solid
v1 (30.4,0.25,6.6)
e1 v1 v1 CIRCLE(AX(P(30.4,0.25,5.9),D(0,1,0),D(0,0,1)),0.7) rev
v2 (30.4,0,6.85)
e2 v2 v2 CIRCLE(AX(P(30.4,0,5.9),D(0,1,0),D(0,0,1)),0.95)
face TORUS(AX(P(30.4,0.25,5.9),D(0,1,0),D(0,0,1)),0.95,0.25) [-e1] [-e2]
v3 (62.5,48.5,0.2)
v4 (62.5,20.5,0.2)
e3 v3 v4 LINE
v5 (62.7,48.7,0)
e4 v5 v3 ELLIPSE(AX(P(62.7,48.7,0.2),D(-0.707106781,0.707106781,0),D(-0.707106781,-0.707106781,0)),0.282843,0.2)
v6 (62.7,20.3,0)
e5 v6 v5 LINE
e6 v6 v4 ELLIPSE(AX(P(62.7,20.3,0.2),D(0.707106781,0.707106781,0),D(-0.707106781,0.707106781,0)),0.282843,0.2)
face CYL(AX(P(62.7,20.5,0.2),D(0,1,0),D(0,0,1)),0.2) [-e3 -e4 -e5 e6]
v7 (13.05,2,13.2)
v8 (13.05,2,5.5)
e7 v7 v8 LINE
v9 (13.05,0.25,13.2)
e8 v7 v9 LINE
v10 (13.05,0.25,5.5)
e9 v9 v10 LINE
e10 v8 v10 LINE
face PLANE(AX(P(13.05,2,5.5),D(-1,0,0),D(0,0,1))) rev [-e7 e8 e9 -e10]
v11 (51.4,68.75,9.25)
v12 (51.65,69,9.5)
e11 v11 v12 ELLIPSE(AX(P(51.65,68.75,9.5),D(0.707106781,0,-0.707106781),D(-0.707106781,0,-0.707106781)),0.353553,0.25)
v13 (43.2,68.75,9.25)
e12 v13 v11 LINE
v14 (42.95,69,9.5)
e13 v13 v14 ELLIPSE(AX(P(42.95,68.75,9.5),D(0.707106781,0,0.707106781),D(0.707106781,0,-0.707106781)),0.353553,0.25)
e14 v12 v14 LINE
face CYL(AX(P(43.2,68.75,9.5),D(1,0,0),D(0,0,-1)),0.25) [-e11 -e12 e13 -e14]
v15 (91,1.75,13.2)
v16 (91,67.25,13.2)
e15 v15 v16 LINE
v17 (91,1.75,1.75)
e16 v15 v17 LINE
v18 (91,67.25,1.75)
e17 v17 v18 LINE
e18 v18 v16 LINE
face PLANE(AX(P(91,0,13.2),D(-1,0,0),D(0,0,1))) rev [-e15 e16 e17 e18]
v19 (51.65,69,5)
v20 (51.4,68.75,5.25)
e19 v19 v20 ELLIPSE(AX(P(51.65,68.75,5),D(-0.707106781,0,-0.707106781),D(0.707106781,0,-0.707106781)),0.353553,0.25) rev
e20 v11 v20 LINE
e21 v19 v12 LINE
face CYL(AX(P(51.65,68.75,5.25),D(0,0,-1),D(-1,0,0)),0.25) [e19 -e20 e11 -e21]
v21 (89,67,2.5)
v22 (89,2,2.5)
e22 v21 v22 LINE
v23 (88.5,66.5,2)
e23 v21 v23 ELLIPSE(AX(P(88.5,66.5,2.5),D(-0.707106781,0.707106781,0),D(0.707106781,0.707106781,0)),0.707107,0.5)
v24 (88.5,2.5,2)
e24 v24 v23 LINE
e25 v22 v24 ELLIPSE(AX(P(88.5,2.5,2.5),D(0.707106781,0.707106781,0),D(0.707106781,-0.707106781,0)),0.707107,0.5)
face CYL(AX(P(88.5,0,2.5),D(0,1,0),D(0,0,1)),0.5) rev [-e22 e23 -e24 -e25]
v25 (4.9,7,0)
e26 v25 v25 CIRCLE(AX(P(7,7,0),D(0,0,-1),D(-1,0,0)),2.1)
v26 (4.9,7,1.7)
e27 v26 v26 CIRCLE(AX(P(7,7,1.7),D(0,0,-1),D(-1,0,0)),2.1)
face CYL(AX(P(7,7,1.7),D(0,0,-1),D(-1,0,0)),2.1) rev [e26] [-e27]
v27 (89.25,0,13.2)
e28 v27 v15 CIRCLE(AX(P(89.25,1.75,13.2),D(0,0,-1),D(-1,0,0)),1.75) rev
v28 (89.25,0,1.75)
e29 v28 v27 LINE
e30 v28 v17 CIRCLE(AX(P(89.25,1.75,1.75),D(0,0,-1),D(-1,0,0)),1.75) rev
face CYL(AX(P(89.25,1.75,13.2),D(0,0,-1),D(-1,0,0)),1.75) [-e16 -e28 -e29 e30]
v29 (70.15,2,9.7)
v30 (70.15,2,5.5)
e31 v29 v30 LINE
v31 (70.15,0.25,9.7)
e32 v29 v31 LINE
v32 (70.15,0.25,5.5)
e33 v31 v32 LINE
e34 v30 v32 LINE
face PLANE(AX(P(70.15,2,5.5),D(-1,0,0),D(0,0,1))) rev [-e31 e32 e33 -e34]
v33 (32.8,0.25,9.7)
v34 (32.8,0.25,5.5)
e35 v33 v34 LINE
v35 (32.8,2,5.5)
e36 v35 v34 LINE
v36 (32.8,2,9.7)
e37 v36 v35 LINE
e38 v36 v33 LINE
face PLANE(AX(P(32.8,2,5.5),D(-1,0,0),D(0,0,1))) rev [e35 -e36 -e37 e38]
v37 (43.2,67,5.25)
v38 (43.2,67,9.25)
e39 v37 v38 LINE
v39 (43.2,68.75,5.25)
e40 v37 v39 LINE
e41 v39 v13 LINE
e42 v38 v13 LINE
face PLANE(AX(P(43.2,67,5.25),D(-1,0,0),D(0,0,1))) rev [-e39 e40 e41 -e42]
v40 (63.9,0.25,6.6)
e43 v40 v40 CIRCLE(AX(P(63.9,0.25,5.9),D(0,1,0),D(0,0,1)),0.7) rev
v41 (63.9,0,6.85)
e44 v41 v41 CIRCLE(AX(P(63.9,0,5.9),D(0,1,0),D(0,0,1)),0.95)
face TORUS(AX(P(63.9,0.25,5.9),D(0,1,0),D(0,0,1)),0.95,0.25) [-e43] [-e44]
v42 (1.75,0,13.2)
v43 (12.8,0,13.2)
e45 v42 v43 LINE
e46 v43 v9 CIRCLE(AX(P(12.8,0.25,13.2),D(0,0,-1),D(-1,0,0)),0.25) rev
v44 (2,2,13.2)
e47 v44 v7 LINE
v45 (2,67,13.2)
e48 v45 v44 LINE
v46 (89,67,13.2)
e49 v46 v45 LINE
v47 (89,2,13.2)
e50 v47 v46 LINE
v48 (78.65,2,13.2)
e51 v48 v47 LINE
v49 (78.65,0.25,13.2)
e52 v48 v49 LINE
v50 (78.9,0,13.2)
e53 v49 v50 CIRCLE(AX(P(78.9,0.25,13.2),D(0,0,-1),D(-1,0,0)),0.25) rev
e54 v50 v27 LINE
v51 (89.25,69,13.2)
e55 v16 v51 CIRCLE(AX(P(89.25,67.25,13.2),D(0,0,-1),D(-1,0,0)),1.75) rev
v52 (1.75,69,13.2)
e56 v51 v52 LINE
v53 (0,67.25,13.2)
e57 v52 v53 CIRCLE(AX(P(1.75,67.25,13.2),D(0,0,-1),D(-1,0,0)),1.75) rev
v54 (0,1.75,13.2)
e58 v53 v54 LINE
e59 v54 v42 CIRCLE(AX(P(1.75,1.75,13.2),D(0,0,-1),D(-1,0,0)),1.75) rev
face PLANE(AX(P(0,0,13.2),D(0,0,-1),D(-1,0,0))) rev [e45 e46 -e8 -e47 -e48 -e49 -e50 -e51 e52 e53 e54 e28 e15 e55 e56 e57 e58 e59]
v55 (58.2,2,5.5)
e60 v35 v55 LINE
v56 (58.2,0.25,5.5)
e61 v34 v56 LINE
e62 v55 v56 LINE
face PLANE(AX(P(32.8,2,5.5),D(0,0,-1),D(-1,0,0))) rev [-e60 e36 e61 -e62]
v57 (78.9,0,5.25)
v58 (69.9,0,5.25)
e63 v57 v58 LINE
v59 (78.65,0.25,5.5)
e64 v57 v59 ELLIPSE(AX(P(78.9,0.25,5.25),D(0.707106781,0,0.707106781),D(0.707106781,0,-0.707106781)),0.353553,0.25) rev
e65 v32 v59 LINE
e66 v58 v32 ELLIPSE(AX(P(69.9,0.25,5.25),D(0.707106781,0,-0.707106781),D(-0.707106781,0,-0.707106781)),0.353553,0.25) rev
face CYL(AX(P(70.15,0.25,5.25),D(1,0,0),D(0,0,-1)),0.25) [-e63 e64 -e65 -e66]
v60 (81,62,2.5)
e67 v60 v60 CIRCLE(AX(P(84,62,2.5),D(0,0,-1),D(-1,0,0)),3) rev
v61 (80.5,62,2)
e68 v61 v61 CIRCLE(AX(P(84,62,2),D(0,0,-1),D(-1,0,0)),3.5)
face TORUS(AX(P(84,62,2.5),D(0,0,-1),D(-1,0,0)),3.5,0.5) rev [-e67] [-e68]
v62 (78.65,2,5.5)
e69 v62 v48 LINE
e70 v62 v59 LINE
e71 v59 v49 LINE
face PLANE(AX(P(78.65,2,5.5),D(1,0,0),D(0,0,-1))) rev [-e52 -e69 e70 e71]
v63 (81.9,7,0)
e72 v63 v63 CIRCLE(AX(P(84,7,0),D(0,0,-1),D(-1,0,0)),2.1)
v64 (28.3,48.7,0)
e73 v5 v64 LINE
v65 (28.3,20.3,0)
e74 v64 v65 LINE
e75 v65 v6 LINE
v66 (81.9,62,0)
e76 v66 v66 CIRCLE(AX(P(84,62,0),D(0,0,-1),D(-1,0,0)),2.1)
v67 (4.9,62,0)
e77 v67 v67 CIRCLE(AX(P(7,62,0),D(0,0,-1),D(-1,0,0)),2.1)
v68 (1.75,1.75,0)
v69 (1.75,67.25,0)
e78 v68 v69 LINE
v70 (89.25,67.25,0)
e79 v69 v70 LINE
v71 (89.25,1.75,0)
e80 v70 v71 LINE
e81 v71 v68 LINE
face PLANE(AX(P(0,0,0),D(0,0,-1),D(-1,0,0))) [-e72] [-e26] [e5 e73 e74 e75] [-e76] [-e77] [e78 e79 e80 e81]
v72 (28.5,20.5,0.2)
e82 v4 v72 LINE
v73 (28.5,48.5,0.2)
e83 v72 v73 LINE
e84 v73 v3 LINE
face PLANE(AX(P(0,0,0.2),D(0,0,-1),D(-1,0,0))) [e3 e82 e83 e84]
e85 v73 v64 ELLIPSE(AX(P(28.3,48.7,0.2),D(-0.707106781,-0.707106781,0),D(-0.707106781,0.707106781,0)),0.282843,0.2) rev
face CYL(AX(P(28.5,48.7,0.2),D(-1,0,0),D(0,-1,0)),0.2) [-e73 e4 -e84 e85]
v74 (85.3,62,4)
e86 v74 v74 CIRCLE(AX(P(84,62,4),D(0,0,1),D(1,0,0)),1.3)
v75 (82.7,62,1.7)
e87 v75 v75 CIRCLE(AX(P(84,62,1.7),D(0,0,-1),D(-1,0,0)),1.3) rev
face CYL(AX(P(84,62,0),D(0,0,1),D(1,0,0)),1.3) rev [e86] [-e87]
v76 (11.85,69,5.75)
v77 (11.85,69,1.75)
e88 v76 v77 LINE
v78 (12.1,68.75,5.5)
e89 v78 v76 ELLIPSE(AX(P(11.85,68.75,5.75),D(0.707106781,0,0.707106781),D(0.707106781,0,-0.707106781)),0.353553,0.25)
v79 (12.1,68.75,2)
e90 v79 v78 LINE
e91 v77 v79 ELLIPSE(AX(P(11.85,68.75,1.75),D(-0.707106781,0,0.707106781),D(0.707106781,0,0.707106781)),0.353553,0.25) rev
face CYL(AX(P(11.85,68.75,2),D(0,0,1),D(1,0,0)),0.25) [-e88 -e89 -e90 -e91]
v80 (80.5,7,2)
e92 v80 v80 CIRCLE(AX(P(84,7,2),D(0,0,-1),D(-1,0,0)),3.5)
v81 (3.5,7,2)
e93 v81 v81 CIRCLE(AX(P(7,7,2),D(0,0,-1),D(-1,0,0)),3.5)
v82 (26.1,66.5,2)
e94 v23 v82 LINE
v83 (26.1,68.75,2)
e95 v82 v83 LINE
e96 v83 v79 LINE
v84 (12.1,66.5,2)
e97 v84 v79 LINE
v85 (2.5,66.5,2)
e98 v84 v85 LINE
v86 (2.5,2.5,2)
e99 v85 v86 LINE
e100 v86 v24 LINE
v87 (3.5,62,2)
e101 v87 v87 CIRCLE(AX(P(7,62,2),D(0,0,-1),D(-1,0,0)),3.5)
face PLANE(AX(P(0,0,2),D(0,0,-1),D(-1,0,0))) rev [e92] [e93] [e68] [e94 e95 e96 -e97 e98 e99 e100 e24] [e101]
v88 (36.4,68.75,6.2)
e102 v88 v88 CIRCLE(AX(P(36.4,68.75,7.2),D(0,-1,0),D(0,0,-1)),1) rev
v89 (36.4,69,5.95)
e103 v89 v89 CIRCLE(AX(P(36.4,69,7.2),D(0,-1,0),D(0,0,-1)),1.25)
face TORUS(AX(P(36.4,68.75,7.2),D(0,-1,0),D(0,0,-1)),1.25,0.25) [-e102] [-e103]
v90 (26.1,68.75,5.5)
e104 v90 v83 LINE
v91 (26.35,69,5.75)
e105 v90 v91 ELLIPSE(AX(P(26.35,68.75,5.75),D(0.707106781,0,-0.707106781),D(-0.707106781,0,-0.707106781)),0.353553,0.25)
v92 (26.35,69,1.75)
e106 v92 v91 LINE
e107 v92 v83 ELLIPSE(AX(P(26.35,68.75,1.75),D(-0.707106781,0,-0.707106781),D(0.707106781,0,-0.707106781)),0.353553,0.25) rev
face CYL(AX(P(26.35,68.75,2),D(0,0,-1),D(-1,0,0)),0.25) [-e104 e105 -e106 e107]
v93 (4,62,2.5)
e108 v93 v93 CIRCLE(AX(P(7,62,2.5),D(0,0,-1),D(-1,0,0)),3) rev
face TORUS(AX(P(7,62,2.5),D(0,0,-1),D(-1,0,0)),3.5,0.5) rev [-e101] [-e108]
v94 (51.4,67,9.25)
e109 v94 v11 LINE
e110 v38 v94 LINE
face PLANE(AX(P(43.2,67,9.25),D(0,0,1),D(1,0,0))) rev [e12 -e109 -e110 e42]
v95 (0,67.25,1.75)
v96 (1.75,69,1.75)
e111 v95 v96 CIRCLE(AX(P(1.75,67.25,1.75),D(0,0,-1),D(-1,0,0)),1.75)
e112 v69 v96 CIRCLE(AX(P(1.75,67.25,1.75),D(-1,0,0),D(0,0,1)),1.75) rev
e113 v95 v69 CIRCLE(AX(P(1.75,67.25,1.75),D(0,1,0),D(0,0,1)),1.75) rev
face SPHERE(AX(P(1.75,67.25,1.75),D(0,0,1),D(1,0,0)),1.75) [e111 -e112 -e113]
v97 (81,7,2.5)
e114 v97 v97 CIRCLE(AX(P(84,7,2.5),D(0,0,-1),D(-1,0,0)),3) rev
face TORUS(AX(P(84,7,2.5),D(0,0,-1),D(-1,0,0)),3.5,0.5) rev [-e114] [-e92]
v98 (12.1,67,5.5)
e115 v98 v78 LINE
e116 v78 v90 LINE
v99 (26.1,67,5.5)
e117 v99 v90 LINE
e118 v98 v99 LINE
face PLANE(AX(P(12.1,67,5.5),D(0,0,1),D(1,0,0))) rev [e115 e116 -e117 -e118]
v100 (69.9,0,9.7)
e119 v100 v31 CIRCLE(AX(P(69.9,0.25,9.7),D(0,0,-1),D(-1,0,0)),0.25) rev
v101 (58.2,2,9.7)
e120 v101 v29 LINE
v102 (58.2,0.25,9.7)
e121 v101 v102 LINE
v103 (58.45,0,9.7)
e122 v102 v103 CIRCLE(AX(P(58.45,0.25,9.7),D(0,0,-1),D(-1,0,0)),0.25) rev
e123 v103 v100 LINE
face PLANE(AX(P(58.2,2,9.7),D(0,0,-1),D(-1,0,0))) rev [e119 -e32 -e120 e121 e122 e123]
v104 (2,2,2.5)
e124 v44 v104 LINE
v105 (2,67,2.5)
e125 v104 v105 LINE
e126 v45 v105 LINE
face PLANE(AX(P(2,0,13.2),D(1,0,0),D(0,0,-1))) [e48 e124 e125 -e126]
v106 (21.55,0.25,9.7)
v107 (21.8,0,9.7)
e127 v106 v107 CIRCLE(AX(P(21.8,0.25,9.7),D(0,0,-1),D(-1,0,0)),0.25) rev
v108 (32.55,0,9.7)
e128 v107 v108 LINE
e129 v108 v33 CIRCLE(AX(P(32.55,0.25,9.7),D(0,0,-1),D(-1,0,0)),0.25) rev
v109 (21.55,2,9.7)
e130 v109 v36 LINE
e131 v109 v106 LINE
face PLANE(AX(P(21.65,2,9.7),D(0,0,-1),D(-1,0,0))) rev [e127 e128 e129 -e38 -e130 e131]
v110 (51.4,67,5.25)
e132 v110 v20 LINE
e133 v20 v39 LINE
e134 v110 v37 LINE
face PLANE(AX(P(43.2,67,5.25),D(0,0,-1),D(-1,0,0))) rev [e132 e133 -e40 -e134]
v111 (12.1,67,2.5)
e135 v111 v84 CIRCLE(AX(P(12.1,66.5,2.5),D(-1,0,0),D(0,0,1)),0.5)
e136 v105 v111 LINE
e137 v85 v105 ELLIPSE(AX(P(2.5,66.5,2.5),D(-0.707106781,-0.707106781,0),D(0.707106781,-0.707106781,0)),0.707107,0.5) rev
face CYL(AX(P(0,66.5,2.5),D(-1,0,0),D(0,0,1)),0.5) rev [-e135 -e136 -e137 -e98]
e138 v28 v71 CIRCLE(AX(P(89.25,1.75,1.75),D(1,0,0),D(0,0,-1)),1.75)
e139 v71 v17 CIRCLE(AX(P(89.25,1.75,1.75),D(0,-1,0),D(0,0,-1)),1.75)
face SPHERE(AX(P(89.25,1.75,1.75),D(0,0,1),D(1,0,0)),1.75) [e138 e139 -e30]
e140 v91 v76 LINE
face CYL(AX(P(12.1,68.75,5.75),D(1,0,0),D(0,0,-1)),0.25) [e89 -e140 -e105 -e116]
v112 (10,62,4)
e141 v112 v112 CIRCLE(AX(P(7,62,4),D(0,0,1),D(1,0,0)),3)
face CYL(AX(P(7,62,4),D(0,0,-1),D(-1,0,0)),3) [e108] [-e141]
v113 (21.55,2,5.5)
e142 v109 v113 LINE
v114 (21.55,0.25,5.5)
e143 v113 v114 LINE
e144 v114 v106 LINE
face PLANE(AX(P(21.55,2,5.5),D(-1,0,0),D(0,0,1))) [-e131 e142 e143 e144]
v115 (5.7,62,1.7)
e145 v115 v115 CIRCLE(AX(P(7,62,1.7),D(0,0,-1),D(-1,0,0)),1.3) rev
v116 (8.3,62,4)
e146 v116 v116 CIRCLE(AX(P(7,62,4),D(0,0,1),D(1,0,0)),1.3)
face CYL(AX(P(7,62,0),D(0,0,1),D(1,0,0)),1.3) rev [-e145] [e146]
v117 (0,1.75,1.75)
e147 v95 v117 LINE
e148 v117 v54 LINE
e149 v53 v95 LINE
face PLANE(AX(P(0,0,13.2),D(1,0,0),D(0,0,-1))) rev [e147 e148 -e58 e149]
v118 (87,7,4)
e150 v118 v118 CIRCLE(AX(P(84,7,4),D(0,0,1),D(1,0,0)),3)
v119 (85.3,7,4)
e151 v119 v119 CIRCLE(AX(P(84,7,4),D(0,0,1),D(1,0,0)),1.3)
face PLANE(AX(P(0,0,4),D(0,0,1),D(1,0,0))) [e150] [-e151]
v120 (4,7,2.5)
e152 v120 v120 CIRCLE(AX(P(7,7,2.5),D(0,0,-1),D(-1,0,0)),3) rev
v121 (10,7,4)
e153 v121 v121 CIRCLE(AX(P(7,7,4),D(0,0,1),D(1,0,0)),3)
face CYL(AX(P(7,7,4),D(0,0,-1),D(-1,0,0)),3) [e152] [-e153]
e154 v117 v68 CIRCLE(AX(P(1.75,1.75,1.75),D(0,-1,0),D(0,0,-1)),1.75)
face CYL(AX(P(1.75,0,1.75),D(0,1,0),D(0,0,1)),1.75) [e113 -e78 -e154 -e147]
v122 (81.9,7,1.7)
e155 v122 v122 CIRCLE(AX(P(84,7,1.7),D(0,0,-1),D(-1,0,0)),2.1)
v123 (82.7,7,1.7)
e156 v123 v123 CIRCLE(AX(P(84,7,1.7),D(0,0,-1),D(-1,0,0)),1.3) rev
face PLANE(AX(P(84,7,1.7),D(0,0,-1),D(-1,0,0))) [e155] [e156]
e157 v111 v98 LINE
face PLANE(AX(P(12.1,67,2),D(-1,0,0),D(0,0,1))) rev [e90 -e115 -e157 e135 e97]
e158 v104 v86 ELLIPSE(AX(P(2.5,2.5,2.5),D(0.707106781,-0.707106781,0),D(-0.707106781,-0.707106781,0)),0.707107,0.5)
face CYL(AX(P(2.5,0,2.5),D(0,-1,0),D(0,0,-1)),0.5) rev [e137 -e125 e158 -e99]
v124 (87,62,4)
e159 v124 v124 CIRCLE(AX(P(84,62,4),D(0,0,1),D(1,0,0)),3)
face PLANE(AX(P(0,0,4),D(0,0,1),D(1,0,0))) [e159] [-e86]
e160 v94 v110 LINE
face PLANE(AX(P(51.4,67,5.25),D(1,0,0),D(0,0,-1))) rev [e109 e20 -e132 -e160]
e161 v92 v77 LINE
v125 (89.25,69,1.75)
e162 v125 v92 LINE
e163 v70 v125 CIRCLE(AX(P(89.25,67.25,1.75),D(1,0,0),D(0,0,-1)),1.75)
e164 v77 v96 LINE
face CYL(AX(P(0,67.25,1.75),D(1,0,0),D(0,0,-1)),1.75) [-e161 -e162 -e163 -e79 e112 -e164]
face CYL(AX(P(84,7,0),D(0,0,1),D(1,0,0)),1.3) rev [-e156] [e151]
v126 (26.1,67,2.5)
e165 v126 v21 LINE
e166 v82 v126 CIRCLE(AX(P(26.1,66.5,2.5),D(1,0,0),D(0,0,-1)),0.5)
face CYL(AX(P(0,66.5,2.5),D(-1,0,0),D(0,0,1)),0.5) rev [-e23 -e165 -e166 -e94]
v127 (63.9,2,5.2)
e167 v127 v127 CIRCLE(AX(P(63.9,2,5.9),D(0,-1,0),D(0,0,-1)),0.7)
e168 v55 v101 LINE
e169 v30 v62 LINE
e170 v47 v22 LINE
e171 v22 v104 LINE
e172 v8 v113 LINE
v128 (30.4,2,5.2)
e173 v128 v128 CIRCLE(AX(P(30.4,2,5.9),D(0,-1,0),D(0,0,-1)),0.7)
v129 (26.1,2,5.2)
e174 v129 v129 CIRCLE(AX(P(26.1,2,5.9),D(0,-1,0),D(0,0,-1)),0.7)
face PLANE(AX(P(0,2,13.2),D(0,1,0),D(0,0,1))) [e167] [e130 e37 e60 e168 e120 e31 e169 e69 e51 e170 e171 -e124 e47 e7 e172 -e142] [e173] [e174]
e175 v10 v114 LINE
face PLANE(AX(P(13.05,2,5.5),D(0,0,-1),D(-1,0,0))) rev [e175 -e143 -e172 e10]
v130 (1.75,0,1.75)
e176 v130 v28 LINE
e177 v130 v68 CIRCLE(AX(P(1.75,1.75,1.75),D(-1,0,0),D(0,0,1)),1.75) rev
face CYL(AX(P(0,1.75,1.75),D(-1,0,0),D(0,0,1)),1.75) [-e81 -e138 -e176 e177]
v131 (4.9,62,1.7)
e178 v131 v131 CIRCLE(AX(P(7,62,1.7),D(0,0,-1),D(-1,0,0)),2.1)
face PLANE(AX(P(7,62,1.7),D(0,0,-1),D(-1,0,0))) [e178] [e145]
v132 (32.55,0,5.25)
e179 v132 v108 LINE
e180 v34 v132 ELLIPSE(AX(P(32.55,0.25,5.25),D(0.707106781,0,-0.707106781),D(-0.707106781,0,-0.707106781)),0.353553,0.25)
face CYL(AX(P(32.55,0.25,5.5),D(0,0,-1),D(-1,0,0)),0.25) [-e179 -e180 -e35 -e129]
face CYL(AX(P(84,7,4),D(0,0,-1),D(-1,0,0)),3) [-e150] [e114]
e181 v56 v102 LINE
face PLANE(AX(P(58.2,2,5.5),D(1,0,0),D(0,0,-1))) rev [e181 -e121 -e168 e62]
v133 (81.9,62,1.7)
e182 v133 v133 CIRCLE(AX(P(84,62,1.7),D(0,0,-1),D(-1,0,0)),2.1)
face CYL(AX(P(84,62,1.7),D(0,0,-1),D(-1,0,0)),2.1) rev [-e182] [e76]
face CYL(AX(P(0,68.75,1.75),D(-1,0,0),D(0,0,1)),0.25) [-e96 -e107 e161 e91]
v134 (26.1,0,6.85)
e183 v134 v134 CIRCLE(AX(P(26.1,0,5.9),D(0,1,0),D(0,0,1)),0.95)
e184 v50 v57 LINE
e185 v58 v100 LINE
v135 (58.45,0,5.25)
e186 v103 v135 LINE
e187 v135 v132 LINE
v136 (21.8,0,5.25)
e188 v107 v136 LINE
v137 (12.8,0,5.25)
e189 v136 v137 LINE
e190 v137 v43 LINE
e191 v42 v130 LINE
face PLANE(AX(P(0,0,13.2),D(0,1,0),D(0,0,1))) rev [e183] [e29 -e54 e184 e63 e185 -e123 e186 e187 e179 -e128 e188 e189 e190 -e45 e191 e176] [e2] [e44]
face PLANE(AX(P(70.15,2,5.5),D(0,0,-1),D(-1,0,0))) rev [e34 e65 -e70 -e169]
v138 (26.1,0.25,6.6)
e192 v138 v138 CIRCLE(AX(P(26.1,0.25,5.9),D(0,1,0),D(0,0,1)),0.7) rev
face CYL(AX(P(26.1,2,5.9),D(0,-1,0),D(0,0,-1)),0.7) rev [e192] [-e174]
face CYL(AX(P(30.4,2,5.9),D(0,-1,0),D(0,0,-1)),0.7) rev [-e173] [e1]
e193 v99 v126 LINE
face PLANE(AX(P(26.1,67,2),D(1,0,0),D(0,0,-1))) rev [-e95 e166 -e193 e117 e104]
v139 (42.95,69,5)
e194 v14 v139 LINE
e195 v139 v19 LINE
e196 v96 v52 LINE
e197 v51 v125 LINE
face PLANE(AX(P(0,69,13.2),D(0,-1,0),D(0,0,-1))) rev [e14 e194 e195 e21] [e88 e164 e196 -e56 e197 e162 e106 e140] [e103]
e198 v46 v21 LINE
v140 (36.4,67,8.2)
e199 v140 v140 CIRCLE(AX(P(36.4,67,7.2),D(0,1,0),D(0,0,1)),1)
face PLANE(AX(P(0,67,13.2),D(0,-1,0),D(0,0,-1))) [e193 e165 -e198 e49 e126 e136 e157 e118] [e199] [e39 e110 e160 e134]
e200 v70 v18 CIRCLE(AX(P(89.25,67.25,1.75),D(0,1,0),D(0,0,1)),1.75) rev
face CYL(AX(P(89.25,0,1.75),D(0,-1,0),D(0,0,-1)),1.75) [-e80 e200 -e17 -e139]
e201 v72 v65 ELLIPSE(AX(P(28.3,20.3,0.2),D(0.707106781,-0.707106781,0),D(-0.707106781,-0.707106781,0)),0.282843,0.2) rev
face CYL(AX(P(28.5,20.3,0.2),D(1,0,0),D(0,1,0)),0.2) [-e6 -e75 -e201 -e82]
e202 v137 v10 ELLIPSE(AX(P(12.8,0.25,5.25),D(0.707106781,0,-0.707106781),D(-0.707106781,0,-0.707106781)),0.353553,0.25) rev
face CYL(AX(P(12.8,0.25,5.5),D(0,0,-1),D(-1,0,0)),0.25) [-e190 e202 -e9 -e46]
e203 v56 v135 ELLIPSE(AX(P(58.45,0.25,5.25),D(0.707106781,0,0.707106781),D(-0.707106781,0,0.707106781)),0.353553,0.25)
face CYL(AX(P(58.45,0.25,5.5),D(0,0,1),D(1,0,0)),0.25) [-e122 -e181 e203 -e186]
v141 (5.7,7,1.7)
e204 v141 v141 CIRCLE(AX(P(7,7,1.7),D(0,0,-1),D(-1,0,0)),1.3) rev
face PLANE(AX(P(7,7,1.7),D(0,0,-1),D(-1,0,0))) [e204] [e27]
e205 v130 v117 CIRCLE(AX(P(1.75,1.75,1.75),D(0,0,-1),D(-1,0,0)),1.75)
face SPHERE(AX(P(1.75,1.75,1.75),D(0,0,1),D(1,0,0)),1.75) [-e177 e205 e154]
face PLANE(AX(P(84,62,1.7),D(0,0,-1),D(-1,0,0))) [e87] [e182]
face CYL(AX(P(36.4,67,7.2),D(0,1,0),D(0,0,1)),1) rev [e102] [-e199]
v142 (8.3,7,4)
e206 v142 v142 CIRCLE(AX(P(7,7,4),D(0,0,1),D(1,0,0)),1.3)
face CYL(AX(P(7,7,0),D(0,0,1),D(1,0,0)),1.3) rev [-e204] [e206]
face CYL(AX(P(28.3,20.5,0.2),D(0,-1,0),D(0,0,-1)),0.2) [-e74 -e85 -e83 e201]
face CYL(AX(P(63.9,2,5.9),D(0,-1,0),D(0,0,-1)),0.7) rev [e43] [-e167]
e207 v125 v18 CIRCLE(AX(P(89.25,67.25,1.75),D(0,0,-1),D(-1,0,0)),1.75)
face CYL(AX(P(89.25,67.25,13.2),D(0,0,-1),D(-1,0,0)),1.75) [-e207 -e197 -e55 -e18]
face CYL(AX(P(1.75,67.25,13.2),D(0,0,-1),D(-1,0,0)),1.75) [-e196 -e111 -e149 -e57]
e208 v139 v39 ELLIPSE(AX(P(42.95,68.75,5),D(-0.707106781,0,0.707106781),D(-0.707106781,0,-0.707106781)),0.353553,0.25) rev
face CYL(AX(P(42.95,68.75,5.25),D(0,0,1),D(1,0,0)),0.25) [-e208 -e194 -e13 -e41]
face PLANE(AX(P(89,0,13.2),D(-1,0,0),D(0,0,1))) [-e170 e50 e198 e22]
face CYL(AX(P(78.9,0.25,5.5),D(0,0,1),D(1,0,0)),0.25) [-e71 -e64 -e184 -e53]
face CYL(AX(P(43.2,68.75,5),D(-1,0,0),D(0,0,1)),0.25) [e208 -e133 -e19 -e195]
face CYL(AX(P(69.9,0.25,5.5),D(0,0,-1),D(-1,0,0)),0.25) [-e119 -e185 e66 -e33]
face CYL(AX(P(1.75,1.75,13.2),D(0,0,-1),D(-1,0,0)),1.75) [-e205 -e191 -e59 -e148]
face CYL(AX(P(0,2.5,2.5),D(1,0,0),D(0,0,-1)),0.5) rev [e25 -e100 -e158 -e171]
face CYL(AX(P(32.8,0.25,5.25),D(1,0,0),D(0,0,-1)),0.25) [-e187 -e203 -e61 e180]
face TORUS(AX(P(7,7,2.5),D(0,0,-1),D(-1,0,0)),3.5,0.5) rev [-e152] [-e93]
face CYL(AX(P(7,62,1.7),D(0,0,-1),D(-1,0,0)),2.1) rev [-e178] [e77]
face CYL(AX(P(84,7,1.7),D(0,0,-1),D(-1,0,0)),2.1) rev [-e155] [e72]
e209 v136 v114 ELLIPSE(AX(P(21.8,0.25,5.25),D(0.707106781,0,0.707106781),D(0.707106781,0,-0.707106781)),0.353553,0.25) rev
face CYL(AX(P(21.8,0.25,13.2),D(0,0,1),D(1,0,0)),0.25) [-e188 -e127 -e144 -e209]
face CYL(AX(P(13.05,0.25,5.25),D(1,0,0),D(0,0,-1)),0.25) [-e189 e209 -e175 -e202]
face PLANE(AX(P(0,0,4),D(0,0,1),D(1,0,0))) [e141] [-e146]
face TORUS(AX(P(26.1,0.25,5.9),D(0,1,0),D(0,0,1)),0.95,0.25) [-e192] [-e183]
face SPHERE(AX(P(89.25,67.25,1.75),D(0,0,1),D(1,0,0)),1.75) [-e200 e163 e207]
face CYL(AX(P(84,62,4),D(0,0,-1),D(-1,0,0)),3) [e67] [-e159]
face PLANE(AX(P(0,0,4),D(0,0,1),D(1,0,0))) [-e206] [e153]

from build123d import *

# Parameters (mm, degrees)
SKETCH1_W           = 91
SKETCH1_H           = 69
BOSS_EXTRUDE1_DEPTH = 13.2
SHELL2_T            = -2
BOSS_EXTRUDE2_DEPTH = 2
SKETCH3_R           = 1.3
CUT_EXTRUDE1_DEPTH  = 4
SKETCH5_R           = 2.1
CUT_EXTRUDE2_DEPTH  = 1.7
SKETCH7_R           = 0.7
CUT_EXTRUDE4_DEPTH  = 2
SKETCH9_R           = 1
CUT_EXTRUDE6_DEPTH  = 2
SKETCH12_W          = 34
SKETCH12_H          = 28
CUT_EXTRUDE9_DEPTH  = 0.2
FILLET5_R           = 0.2
FILLET6_R           = 1.75
SKETCH6_W           = 8.6
SKETCH6_H           = 7.7
SKETCH6_W_2         = 8.5
SKETCH6_W_3         = 25.4
CUT_EXTRUDE10_DEPTH = 2
SKETCH8_W           = 14
SKETCH8_H           = 3.5
SKETCH8_W_2         = 8.2
SKETCH8_H_2         = 4
CUT_EXTRUDE12_DEPTH = 2
SKETCH16_W          = 0.1
SKETCH16_H          = 7.7
BOSS_EXTRUDE3_DEPTH = 2
SKETCH14_W          = 11.15
SKETCH14_H          = 3.5
SKETCH14_W_2        = 11.95
CUT_EXTRUDE13_DEPTH = 2
SKETCH17_W          = 0.1
SKETCH17_H          = 3.5
CUT_EXTRUDE14_DEPTH = 2
FILLET8_R           = 0.25
FILLET9_R           = 0.5


with BuildPart() as part:
    # Sketch1 → Boss-Extrude1 (new body)
    with BuildSketch(Plane.XY):
        with Locations((45.5, 34.5)):
            Rectangle(SKETCH1_W, SKETCH1_H)
    extrude(amount=BOSS_EXTRUDE1_DEPTH)

    # Shell2
    shell2_openings = [part.faces().sort_by_distance(p)[0] for p in [
        (45.5, 34.5, 13.2),
    ]]
    offset(amount=SHELL2_T, openings=shell2_openings, kind=Kind.INTERSECTION)

    # Sketch2 → Boss-Extrude2 (add)
    with BuildSketch(Plane.XY.offset(2)):
        with BuildLine():
            ThreePointArc((4, 7), (4.878679656, 4.878679656), (7, 4))
            Line((7, 4), (7, 7))
            Line((7, 7), (4, 7))
        make_face()
        with BuildLine():
            Line((7, 7), (7, 4))
            ThreePointArc((7, 4), (9.121320344, 4.878679656), (10, 7))
            ThreePointArc((10, 7), (7, 10), (4, 7))
            Line((4, 7), (7, 7))
        make_face()
        with BuildLine():
            ThreePointArc((10, 62), (9.121320344, 64.121320344), (7, 65))
            Line((7, 65), (7, 62))
            Line((7, 62), (4, 62))
            ThreePointArc((4, 62), (7, 59), (10, 62))
        make_face()
        with BuildLine():
            Line((7, 62), (7, 65))
            ThreePointArc((7, 65), (4.878679656, 64.121320344), (4, 62))
            Line((4, 62), (7, 62))
        make_face()
        with BuildLine():
            ThreePointArc((87, 62), (86.121320344, 64.121320344), (84, 65))
            Line((84, 65), (84, 62))
            Line((84, 62), (87, 62))
        make_face()
        with BuildLine():
            Line((84, 62), (84, 65))
            ThreePointArc((84, 65), (81.878679656, 59.878679656), (87, 62))
            Line((87, 62), (84, 62))
        make_face()
        with BuildLine():
            ThreePointArc((87, 7), (81.878679656, 9.121320344), (84, 4))
            Line((84, 4), (84, 7))
            Line((84, 7), (87, 7))
        make_face()
        with BuildLine():
            Line((84, 7), (84, 4))
            ThreePointArc((84, 4), (86.121320344, 4.878679656), (87, 7))
            Line((87, 7), (84, 7))
        make_face()
    extrude(amount=BOSS_EXTRUDE2_DEPTH)

    # Sketch3 → Cut-Extrude1 (cut)
    with BuildSketch(Plane.XY.offset(4)):
        with Locations((7, 62)):
            Circle(SKETCH3_R)
        with Locations((84, 62)):
            Circle(SKETCH3_R)
        with Locations((84, 7)):
            Circle(SKETCH3_R)
        with Locations((7, 7)):
            Circle(SKETCH3_R)
    extrude(amount=-CUT_EXTRUDE1_DEPTH, mode=Mode.SUBTRACT)

    # Sketch5 → Cut-Extrude2 (cut)
    with BuildSketch(Plane(origin=(0, 0, 0), x_dir=(-1, 0, 0), z_dir=(0, 0, -1))):
        with Locations((-84, 62)):
            Circle(SKETCH5_R)
        with Locations((-7, 62)):
            Circle(SKETCH5_R)
        with Locations((-7, 7)):
            Circle(SKETCH5_R)
        with Locations((-84, 7)):
            Circle(SKETCH5_R)
    extrude(amount=-CUT_EXTRUDE2_DEPTH, mode=Mode.SUBTRACT)

    # Sketch7 → Cut-Extrude4 (cut)
    with BuildSketch(Plane(origin=(0, 0, 0), x_dir=(-1, 0, 0), z_dir=(0, -1, 0))):
        with Locations(Location((-26.1, -5.9, 0), (0, 0, 90))):
            Circle(SKETCH7_R)
        with Locations(Location((-30.4, -5.9, 0), (0, 0, 90))):
            Circle(SKETCH7_R)
        with Locations(Location((-63.9, -5.9, 0), (0, 0, 90))):
            Circle(SKETCH7_R)
    extrude(amount=-CUT_EXTRUDE4_DEPTH, mode=Mode.SUBTRACT)

    # Sketch9 → Cut-Extrude6 (cut)
    with BuildSketch(Plane(origin=(0, 69, 0), x_dir=(1, 0, 0), z_dir=(0, 1, 0))):
        with Locations(Location((36.4, -7.2, 0), (0, 0, 270))):
            Circle(SKETCH9_R)
    extrude(amount=-CUT_EXTRUDE6_DEPTH, mode=Mode.SUBTRACT)

    # Sketch12 → Cut-Extrude9 (cut)
    with BuildSketch(Plane(origin=(0, 0, 0), x_dir=(-1, 0, 0), z_dir=(0, 0, -1))):
        with Locations((-45.5, 34.5)):
            Rectangle(SKETCH12_W, SKETCH12_H)
    extrude(amount=-CUT_EXTRUDE9_DEPTH, mode=Mode.SUBTRACT)

    # Fillet5
    fillet5_edges = [part.edges().sort_by_distance(p)[0] for p in [
        (45.5, 48.5, 0),
        (62.5, 34.5, 0),
        (28.5, 34.5, 0),
        (45.5, 20.5, 0),
    ]]
    fillet(fillet5_edges, radius=FILLET5_R - 0.0001)  # a hair under: the kernel refuses the full size

    # Fillet6
    fillet6_edges = [part.edges().sort_by_distance(p)[0] for p in [
        (45.5, 69, 0),
        (91, 34.5, 0),
        (45.5, 0, 0),
        (0, 34.5, 0),
        (0, 69, 6.6),
        (91, 69, 6.6),
        (91, 0, 6.6),
        (0, 0, 6.6),
    ]]
    fillet(fillet6_edges, radius=FILLET6_R)

    # Sketch6 → Cut-Extrude10 (cut)
    with BuildSketch(Plane(origin=(0, 0, 0), x_dir=(-1, 0, 0), z_dir=(0, -1, 0))):
        with Locations((-17.35, -9.35)):
            Rectangle(SKETCH6_W, SKETCH6_H)
        with Locations((-74.4, -9.35)):
            Rectangle(SKETCH6_W_2, SKETCH6_H)
        with Locations((-45.5, -9.35)):
            Rectangle(SKETCH6_W_3, SKETCH6_H)
    extrude(amount=-CUT_EXTRUDE10_DEPTH, mode=Mode.SUBTRACT)

    # Sketch8 → Cut-Extrude12 (cut)
    with BuildSketch(Plane(origin=(0, 69, 0), x_dir=(1, 0, 0), z_dir=(0, 1, 0))):
        with Locations((19.1, -3.75)):
            Rectangle(SKETCH8_W, SKETCH8_H)
        with Locations((47.3, -7.25)):
            Rectangle(SKETCH8_W_2, SKETCH8_H_2)
    extrude(amount=-CUT_EXTRUDE12_DEPTH, mode=Mode.SUBTRACT)

    # Sketch16 → Boss-Extrude3 (add)
    with BuildSketch(Plane(origin=(0, 0, 0), x_dir=(-1, 0, 0), z_dir=(0, -1, 0))):
        with Locations((-21.6, -9.35)):
            Rectangle(SKETCH16_W, SKETCH16_H)
    extrude(amount=-BOSS_EXTRUDE3_DEPTH)

    # Sketch14 → Cut-Extrude13 (cut)
    with BuildSketch(Plane(origin=(0, 0, 0), x_dir=(-1, 0, 0), z_dir=(0, -1, 0))):
        with Locations((-27.225, -11.45)):
            Rectangle(SKETCH14_W, SKETCH14_H)
        with Locations((-64.175, -11.45)):
            Rectangle(SKETCH14_W_2, SKETCH14_H)
    extrude(amount=-CUT_EXTRUDE13_DEPTH, mode=Mode.SUBTRACT)

    # Sketch17 → Cut-Extrude14 (cut)
    with BuildSketch(Plane(origin=(0, 0, 0), x_dir=(-1, 0, 0), z_dir=(0, -1, 0))):
        with Locations((-21.6, -11.45)):
            Rectangle(SKETCH17_W, SKETCH17_H)
    extrude(amount=-CUT_EXTRUDE14_DEPTH, mode=Mode.SUBTRACT)

    # Fillet8
    fillet8_edges = [part.edges().sort_by_distance(p)[0] for p in [
        (13.05, 0, 9.35),
        (17.3, 0, 5.5),
        (74.4, 0, 5.5),
        (78.65, 0, 9.35),
        (45.5, 0, 5.5),
        (58.2, 0, 7.6),
        (12.1, 69, 3.75),
        (19.1, 69, 5.5),
        (26.1, 69, 3.75),
        (19.1, 69, 2),
        (43.2, 69, 7.25),
        (47.3, 69, 9.25),
        (51.4, 69, 7.25),
        (47.3, 69, 5.25),
        (70.15, 0, 7.6),
        (32.8, 0, 7.6),
        (21.55, 0, 7.6),
        (26.1, 0, 6.6),
        (30.4, 0, 6.6),
        (63.9, 0, 6.6),
        (36.4, 69, 6.2),
    ]]
    fillet(fillet8_edges, radius=FILLET8_R - 0.0001)  # a hair under: the kernel refuses the full size

    # Fillet9
    fillet9_edges = [part.edges().sort_by_distance(p)[0] for p in [
        (2, 34.5, 2),
        (45.5, 2, 2),
        (89, 34.5, 2),
        (57.55, 67, 2),
        (7.05, 67, 2),
        (10, 7, 2),
        (7, 59, 2),
        (81, 62, 2),
        (84, 10, 2),
    ]]
    fillet(fillet9_edges, radius=FILLET9_R)


solid = part.part
